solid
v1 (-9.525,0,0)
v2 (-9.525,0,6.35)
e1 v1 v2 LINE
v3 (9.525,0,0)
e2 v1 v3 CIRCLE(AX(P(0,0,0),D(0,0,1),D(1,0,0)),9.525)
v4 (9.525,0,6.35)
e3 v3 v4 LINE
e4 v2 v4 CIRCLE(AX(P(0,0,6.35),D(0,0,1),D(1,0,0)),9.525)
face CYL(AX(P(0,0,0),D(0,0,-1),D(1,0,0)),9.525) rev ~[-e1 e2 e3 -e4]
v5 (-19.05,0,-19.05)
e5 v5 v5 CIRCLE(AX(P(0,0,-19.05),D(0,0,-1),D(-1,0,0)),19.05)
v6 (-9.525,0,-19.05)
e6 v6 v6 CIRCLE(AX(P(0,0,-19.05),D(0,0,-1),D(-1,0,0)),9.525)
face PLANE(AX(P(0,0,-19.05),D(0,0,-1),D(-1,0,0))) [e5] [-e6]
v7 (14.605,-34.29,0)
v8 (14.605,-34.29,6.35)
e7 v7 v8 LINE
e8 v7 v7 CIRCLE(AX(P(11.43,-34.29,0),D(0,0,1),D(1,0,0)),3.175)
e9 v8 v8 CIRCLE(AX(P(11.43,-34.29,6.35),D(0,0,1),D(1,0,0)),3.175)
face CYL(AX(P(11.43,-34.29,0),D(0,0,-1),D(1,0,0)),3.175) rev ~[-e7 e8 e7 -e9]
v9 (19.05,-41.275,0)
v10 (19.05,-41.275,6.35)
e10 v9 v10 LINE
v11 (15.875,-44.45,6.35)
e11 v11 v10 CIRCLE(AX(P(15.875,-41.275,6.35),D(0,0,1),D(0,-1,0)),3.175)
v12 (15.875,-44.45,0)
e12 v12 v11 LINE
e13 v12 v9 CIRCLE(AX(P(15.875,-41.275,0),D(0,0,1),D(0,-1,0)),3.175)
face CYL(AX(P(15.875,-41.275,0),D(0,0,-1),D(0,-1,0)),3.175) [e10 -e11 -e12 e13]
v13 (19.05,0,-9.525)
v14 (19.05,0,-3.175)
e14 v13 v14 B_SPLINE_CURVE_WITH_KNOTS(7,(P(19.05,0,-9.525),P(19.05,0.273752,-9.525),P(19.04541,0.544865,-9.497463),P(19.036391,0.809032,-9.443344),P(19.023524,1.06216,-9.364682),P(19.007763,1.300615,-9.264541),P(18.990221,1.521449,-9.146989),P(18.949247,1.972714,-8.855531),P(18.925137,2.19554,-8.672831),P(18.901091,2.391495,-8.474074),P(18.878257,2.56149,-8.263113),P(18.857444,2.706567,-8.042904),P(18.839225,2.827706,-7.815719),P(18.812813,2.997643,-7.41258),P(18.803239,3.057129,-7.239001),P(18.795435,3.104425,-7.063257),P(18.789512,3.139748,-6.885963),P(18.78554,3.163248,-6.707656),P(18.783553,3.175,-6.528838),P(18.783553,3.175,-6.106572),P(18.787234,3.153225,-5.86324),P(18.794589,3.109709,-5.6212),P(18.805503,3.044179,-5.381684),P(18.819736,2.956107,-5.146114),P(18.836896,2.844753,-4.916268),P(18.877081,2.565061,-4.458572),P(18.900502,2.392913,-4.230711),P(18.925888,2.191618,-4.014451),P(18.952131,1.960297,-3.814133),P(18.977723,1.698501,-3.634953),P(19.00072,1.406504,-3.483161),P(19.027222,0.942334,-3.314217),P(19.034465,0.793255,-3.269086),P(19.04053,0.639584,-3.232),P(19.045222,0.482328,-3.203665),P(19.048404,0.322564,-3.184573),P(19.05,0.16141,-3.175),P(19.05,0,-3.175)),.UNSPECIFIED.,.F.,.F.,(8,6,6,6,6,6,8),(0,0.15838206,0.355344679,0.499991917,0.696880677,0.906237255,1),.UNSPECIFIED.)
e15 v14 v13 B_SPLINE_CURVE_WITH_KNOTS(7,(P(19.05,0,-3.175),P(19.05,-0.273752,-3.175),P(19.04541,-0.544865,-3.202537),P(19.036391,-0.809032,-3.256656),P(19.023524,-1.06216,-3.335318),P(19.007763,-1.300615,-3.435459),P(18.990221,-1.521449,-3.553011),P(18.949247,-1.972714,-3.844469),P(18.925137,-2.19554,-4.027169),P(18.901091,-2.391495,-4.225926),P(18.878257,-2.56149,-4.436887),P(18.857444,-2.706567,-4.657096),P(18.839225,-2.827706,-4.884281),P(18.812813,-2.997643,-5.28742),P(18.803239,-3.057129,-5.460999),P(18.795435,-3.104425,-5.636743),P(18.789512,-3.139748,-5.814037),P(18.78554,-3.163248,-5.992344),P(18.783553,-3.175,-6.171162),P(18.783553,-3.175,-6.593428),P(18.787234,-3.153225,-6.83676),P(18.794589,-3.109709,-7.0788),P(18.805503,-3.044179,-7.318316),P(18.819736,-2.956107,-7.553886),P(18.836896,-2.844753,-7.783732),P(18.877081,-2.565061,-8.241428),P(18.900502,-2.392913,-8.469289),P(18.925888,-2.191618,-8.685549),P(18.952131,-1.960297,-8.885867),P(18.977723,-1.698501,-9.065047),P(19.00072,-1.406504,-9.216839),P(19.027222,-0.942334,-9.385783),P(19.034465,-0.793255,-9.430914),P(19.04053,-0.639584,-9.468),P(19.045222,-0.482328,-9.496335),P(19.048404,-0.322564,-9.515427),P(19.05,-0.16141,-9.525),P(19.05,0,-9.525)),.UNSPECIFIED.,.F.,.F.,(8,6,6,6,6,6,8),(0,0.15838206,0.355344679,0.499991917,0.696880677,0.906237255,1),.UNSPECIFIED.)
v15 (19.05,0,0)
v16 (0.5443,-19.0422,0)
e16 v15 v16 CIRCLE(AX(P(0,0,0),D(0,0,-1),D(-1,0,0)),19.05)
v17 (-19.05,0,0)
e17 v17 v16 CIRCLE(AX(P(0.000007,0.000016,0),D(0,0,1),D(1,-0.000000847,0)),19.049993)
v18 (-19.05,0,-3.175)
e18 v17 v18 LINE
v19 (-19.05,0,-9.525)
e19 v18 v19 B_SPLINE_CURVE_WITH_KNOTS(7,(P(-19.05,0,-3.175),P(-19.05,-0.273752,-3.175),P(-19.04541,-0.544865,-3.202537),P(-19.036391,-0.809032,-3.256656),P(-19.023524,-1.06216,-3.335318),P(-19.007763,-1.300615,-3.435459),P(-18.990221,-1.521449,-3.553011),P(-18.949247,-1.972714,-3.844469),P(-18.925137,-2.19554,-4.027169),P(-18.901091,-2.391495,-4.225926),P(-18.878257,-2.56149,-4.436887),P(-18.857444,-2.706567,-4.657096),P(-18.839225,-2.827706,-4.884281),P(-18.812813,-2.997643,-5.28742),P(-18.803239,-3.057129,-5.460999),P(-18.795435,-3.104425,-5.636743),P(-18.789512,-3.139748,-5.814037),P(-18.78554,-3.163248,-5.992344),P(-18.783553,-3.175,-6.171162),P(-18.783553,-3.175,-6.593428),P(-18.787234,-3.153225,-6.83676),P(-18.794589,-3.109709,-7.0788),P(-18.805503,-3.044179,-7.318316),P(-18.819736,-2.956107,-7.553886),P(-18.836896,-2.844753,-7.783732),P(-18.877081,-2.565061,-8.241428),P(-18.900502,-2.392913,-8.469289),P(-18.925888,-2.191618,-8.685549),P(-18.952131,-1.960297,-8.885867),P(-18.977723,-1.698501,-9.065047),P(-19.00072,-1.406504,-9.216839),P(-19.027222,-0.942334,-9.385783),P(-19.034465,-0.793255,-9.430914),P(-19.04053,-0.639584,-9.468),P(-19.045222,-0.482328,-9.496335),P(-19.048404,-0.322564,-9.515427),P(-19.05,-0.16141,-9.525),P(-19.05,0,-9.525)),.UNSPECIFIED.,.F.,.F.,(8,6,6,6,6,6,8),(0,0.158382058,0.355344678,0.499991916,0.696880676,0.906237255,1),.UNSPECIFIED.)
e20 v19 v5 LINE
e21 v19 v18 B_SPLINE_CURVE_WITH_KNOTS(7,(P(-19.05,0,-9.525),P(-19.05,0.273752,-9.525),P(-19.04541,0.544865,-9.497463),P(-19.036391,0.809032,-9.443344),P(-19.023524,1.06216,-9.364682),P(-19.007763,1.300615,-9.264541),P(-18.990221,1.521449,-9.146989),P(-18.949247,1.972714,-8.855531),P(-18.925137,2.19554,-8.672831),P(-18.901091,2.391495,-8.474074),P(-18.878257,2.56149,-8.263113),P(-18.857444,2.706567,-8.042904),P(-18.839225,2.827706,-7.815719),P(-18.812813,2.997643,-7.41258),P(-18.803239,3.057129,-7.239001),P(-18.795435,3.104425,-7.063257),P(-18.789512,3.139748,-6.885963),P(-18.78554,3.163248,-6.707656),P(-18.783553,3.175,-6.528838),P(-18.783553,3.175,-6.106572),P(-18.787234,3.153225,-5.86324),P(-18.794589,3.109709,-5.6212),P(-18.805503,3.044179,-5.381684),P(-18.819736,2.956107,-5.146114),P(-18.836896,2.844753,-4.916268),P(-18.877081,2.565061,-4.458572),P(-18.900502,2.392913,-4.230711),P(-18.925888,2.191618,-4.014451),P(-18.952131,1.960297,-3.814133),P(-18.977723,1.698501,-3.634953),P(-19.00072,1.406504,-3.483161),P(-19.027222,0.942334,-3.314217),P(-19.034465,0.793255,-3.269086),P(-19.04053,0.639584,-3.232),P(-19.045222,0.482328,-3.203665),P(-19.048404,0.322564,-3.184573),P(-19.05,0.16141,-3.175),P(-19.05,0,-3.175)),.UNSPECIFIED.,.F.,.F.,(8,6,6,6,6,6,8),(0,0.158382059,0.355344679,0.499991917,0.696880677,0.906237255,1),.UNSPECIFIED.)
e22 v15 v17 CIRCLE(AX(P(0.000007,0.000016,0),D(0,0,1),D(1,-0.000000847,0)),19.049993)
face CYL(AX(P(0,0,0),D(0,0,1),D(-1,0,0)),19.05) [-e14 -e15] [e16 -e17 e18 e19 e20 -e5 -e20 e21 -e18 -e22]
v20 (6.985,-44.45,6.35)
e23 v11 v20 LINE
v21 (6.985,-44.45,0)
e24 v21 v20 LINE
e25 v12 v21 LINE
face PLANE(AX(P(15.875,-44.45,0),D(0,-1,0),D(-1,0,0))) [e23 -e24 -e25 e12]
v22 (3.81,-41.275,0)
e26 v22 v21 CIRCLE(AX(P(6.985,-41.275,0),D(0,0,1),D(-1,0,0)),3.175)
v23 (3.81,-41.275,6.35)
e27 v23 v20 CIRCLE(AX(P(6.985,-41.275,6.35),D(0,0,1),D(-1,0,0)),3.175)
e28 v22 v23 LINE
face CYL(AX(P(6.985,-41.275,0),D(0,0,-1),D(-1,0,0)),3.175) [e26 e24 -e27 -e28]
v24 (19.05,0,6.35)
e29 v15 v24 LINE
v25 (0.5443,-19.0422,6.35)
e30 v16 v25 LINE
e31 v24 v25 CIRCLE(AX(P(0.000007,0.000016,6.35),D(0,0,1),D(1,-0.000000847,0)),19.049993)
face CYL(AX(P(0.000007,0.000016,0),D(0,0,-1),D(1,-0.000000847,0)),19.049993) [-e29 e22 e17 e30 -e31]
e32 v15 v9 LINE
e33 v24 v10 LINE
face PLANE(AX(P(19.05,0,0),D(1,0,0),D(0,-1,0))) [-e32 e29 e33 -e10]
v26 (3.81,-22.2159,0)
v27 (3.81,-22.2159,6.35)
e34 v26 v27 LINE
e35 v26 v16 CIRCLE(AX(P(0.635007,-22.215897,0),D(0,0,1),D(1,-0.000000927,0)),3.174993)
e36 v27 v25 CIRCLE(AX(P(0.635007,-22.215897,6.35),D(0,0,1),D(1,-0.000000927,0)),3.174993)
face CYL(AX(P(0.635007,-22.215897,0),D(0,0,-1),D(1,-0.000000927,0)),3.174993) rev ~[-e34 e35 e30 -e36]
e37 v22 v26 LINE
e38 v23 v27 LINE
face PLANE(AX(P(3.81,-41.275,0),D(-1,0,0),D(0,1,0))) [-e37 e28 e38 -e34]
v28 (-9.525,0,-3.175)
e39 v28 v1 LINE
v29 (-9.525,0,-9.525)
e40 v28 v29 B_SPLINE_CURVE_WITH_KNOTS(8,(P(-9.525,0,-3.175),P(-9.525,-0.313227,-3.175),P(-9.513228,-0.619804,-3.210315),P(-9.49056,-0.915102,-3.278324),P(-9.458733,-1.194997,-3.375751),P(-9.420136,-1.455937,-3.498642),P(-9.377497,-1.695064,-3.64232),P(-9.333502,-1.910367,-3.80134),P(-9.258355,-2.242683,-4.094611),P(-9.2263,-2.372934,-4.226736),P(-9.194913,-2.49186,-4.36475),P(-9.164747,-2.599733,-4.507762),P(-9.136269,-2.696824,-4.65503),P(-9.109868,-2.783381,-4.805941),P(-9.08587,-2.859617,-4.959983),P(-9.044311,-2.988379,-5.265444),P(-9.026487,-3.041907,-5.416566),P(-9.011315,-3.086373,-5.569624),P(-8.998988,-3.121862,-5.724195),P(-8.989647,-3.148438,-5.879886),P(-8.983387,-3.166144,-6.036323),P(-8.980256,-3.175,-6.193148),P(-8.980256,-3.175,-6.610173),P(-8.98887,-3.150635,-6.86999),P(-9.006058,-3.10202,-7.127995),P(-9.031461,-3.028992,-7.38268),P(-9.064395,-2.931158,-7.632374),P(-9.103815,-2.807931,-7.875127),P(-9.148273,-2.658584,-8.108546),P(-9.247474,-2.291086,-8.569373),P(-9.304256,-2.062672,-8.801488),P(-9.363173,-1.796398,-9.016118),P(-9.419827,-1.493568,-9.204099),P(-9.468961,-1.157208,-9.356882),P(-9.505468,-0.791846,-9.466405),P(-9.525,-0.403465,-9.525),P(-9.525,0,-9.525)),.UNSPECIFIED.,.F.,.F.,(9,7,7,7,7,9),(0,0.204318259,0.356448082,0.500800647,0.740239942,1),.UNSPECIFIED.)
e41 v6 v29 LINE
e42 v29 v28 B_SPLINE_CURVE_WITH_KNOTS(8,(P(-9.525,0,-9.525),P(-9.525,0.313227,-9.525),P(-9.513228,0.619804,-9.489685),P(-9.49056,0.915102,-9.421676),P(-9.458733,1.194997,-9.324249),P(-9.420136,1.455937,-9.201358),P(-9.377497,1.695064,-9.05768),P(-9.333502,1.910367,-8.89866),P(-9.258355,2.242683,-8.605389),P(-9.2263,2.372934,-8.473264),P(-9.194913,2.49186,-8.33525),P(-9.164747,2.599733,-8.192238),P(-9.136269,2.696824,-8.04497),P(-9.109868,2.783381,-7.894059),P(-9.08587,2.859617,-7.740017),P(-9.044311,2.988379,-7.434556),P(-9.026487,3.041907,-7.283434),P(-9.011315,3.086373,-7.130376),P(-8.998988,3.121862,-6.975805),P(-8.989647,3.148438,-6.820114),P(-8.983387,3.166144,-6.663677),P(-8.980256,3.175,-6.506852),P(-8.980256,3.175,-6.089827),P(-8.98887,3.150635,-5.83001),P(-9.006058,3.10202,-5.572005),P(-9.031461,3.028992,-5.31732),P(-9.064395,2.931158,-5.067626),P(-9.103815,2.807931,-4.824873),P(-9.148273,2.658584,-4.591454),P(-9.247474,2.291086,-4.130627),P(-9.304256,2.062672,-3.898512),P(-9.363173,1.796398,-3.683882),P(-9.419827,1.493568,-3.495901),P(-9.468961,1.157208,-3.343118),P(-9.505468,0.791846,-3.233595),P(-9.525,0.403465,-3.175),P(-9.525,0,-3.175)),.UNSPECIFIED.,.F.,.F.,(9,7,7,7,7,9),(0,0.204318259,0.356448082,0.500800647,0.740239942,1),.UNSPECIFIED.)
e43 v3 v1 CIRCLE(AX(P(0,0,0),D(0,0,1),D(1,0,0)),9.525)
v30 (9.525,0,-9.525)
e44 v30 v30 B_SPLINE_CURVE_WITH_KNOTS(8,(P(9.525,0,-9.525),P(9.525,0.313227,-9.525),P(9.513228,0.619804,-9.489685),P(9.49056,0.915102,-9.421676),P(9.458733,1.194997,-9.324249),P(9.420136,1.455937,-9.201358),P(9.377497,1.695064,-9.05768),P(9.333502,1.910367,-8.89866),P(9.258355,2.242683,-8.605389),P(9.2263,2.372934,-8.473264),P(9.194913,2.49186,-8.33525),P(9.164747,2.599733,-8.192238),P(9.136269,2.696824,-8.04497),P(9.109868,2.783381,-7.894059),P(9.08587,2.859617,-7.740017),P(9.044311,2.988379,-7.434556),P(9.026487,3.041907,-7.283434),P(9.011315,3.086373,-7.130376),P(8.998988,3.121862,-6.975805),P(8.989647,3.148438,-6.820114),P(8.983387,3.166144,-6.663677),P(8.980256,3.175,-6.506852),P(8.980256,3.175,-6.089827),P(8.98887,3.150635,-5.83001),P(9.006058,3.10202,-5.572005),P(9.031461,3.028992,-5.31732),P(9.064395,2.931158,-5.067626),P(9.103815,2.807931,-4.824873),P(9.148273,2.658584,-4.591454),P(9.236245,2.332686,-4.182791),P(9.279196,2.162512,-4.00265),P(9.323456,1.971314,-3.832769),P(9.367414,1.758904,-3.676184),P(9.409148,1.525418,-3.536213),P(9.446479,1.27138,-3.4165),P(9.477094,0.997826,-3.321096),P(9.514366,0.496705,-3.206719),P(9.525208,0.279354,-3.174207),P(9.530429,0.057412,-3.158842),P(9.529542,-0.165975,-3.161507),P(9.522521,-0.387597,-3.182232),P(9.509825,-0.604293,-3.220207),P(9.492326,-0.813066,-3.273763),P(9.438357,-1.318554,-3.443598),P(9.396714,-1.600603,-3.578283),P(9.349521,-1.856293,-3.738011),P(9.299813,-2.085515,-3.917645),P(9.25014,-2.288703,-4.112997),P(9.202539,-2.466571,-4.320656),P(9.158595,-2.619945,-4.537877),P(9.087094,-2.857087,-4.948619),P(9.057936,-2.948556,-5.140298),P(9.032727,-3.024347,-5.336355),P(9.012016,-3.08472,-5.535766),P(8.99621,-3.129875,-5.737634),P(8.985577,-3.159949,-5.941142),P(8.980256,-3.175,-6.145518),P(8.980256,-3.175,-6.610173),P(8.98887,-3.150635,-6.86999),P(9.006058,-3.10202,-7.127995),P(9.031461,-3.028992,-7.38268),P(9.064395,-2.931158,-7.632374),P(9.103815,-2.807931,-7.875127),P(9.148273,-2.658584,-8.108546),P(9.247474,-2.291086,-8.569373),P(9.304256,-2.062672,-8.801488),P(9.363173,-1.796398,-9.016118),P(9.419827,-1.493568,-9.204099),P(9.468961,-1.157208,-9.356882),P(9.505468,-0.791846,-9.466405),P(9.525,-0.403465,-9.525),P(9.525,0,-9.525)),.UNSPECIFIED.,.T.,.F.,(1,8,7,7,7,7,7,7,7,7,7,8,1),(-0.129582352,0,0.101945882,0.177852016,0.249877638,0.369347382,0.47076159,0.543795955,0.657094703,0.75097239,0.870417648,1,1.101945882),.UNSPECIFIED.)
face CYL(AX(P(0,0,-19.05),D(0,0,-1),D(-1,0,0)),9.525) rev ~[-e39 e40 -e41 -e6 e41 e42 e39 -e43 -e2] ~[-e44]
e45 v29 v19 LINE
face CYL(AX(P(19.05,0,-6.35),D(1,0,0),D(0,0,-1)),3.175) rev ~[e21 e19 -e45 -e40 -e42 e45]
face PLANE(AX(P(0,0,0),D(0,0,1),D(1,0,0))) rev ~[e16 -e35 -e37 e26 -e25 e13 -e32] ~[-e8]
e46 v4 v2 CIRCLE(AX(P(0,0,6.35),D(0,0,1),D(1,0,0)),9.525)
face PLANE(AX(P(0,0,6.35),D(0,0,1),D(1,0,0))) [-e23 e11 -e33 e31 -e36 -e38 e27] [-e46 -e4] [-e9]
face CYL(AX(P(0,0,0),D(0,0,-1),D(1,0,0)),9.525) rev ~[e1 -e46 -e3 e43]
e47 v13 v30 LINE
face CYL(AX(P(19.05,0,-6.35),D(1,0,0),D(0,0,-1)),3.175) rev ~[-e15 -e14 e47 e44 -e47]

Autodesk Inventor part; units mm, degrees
ref_plane "YZ Plane" through (0, 0, 0) normal (1, 0, 0) x (0, 1, 0)
ref_plane "XZ Plane" through (0, 0, 0) normal (0, 1, 0) x (-1, 0, 0)
ref_plane "XY Plane" through (0, 0, 0) normal (0, 0, 1) x (1, 0, 0)
sketch "Sketch1" plane through (0, 0, 0) normal (0, 0, 1) x (1, 0, 0)
  arc A0 (19.05, 0) -> (0.5443, -19.0422) centre (0, 0) ccw
  circle A1 centre (0, 0) radius 9.525
  line L0 (19.05, 0) -> (19.05, -41.275)
  line L1 (15.875, -44.45) -> (6.985, -44.45)
  line L2 (3.81, -41.275) -> (3.81, -22.2159)
  circle A2 centre (11.43, -34.29) radius 3.175
  arc A3 (3.81, -41.275) -> (6.985, -44.45) centre (6.985, -41.275) ccw
  arc A4 (15.875, -44.45) -> (19.05, -41.275) centre (15.875, -41.275) ccw
  arc A5 (3.81, -22.2159) -> (0.5443, -19.0422) centre (0.635, -22.2159) ccw
  point P0 (19.05, -44.45)
  point P1 (3.81, -44.45)
  point P2 (3.81, -18.6651)
  dimension "d0" = 38.1
  dimension "d1" = 19.05
  dimension "d2" = 44.45
  dimension "d3" = 15.24
  dimension "d4" = 6.35
  dimension "d5" = 7.62
  dimension "d6" = 10.16
  dimension "d7" = 3.175
  dimension "d8" = 3.175
extrude "Extrusion1" add sketch "Sketch1" along normal blind 6.35
sketch "Sketch2" plane through (0, 0, 0) normal (0, 0, -1) x (-1, 0, 0)
  circle A0 centre (0, 0) radius 19.05
  dimension "d11" = 38.1
extrude "Extrusion2" add sketch "Sketch2" along normal blind 19.05
sketch "Sketch3" plane through (0, 0, -19.05) normal (0, 0, -1) x (-1, 0, 0)
  circle A0 centre (0, 0) radius 9.525
  dimension "d14" = 19.05
extrude "Extrusion3" cut sketch "Sketch3" against normal through all
sketch "Sketch4" plane through (19.05, -41.275, 0) normal (1, 0, 0) x (0, 0, -1)
  circle A0 centre (6.35, 41.275) radius 3.175
  line L0 (19.05, 22.225) -> (19.05, 60.325) projected
  point P0 (0, 41.275)
  dimension "d17" = 6.35
  dimension "d18" = 0
  dimension "d19" = 12.7
extrude "Extrusion4" cut sketch "Sketch4" against normal through all
properties part number "HW 4 Part 6" material "Aluminum 6061"
